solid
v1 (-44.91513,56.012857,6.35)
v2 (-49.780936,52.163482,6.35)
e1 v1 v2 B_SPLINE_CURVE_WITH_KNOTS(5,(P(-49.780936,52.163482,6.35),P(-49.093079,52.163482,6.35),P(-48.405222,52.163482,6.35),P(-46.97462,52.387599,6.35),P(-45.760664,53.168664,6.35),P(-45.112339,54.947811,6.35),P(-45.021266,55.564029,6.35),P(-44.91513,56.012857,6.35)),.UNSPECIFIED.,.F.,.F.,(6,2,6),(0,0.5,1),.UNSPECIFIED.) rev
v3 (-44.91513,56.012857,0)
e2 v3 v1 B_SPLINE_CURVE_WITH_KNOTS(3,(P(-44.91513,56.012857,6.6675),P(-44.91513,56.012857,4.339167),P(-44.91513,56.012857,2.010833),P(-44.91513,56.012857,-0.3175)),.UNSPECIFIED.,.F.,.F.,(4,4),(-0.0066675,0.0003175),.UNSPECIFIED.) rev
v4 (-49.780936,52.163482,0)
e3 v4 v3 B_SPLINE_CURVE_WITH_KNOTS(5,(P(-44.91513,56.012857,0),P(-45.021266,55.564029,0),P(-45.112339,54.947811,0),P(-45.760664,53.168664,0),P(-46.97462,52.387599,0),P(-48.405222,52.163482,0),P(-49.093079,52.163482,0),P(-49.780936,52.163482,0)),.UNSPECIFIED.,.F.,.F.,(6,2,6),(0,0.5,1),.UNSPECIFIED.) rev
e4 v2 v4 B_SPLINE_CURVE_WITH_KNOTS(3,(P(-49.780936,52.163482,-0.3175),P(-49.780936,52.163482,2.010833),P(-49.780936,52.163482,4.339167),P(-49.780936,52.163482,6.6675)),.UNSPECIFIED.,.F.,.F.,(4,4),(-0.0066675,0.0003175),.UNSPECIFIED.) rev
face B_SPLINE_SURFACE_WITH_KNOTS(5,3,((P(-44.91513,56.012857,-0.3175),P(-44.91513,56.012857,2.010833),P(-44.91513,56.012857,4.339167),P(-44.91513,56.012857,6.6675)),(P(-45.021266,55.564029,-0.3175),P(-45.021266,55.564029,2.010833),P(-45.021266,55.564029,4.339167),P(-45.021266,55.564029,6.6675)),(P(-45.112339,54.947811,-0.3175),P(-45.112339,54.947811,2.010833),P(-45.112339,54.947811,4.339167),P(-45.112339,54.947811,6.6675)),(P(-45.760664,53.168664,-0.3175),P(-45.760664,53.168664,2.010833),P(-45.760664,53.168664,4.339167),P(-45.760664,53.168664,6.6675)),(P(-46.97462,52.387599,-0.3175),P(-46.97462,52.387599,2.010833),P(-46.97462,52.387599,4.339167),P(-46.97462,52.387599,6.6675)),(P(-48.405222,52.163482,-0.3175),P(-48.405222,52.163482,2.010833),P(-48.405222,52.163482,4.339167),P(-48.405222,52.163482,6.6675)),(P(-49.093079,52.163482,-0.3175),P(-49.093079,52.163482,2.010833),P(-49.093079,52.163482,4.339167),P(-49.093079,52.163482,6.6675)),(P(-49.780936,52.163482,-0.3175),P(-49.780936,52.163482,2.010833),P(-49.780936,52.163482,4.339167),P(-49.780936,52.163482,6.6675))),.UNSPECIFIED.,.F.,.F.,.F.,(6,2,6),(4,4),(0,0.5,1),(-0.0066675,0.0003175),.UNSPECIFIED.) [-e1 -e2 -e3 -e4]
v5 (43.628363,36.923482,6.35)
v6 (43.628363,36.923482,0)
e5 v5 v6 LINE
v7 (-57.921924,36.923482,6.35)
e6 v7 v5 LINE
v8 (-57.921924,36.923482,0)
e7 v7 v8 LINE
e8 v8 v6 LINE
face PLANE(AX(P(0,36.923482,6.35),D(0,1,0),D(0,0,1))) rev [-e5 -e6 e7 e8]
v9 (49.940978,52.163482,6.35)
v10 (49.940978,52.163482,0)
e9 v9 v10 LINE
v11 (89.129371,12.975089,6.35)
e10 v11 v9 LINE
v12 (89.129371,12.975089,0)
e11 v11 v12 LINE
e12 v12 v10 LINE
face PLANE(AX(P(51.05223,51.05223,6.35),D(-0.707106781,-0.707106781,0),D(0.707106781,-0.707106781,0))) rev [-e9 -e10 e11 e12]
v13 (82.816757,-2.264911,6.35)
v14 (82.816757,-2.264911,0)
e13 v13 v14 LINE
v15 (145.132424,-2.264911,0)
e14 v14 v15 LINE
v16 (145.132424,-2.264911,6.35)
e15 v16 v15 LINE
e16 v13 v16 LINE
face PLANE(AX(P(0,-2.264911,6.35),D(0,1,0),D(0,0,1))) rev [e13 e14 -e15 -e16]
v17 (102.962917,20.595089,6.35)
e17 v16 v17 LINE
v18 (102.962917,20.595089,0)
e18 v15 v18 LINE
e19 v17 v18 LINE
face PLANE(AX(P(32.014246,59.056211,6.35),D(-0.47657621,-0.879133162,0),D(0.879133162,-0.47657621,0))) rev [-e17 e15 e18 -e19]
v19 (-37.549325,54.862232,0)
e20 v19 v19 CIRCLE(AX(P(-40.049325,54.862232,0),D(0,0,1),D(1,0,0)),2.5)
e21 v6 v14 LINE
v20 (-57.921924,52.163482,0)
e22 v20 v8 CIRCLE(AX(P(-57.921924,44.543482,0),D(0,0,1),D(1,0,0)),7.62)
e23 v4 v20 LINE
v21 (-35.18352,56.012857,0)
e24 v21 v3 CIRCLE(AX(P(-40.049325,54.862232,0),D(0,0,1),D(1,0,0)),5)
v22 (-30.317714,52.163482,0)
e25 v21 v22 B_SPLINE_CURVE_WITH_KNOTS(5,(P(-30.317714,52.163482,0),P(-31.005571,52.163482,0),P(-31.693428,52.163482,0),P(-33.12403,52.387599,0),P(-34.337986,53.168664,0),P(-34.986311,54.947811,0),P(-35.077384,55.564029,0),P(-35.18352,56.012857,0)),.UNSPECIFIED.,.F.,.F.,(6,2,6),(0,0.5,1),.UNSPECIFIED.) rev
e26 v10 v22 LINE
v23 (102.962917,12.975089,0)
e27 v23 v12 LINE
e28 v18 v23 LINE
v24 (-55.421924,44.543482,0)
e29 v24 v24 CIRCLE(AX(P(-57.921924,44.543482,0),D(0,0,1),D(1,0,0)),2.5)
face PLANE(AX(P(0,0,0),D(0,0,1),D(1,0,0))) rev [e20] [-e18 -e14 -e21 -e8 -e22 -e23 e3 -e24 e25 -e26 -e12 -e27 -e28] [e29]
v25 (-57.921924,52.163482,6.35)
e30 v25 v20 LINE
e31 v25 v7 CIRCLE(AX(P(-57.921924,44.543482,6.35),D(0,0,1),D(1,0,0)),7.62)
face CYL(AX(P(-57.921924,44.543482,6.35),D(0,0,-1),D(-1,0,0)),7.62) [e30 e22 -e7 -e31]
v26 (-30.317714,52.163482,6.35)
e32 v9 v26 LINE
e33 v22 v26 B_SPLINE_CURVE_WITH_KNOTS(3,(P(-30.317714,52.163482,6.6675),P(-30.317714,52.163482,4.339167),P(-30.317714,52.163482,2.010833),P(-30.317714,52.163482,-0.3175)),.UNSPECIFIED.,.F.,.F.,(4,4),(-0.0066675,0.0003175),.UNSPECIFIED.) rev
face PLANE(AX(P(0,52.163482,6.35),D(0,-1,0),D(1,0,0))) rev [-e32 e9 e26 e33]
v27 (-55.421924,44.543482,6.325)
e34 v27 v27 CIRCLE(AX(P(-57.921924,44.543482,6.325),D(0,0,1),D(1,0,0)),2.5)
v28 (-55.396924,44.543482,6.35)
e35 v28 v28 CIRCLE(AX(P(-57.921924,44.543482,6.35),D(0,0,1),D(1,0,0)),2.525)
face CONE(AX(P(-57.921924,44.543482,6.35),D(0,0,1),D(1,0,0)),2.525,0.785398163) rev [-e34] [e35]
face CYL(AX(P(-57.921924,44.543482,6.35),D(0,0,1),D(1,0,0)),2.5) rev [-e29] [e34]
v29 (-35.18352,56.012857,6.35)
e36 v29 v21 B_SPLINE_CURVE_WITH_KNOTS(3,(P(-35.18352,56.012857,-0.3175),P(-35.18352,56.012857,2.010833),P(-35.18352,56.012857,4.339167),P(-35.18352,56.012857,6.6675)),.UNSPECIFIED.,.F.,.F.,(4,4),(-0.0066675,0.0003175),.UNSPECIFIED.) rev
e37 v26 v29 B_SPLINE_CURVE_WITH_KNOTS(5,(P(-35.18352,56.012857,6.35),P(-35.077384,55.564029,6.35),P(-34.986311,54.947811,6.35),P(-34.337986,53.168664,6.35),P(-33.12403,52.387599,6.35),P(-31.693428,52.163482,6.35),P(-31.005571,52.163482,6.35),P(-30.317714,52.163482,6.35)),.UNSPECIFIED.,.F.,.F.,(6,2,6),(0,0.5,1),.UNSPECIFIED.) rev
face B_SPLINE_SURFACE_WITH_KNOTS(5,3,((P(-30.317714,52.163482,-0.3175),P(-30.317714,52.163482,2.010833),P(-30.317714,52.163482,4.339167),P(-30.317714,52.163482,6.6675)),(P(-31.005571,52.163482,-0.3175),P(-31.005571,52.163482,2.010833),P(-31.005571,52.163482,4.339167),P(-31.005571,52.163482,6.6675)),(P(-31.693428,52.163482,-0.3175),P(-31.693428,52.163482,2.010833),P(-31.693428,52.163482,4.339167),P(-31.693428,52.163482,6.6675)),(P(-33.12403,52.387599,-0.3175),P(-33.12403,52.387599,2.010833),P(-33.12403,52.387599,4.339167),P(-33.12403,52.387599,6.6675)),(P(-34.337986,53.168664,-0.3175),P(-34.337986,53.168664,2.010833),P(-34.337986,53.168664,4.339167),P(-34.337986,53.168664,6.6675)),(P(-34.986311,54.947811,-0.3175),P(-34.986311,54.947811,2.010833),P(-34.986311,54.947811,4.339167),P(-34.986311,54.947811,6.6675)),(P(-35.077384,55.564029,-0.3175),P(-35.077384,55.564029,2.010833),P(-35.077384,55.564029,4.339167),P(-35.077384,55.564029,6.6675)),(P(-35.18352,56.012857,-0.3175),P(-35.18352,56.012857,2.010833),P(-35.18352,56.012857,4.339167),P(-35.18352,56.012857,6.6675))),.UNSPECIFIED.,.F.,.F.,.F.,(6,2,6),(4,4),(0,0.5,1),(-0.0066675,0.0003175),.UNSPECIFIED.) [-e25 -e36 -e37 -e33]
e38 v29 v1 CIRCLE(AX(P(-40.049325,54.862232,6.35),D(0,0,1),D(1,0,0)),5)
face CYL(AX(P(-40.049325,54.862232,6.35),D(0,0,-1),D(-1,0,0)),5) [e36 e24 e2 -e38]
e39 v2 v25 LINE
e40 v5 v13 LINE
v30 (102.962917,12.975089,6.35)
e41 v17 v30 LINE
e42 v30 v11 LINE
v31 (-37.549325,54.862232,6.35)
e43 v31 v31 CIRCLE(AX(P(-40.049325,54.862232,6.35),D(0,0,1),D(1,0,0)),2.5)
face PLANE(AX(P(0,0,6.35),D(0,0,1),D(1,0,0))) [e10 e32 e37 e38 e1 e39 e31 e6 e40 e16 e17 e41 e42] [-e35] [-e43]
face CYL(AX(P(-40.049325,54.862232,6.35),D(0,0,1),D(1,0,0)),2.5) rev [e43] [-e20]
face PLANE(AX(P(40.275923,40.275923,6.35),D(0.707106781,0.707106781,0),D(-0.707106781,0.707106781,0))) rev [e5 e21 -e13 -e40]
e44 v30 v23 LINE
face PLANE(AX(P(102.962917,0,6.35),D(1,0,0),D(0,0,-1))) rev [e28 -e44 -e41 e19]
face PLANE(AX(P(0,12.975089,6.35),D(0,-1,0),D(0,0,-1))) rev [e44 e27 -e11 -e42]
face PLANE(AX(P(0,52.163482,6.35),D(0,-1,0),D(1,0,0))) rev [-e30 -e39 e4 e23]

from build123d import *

# Parameters (mm, degrees)
SKETCH1_R                       = 7.62
BOSS_EXTRUDE1_DEPTH             = 6.35
F_5_0MM_DOWEL_HOLE1_D           = 5
F_5_0MM_DOWEL_HOLE1_CSINK_D     = 5.05
F_5_0MM_DOWEL_HOLE1_CSINK_ANGLE = 90
BOSS_EXTRUDE3_DEPTH             = 6.35
FILLET2_DEPTH                   = 6.35
F_5_0MM_DOWEL_HOLE3_D           = 5


with BuildPart() as part:
    # Sketch1 → Boss-Extrude1 (new body)
    with BuildSketch(Plane.XY):
        with BuildLine():
            ThreePointArc((-50.301924176, 44.54348243), (-52.533770503, 39.155328757), (-57.921924176, 36.92348243))
            Line((-57.921924176, 36.92348243), (43.628363104, 36.92348243))
            Line((43.628363104, 36.92348243), (82.81675676, -2.264911225))
            Line((82.81675676, -2.264911225), (145.132424058, -2.264911225))
            Line((145.132424058, -2.264911225), (102.962916525, 20.595088775))
            Line((102.962916525, 20.595088775), (102.962916525, 12.975088775))
            Line((102.962916525, 12.975088775), (89.12937145, 12.975088775))
            Line((89.12937145, 12.975088775), (49.940977795, 52.16348243))
            Line((49.940977795, 52.16348243), (-57.921924176, 52.16348243))
            ThreePointArc((-57.921924176, 52.16348243), (-52.533770503, 49.931636103), (-50.301924176, 44.54348243))
        make_face()
        with Locations((-57.921924176, 44.54348243)):
            Circle(SKETCH1_R)
    extrude(amount=BOSS_EXTRUDE1_DEPTH)

    # Ø5.0mm Dowel Hole1 (through all)
    with Locations(Plane.XY.offset(6.35)):
        with Locations((-57.921924176, 44.54348243)):
            CounterSinkHole(F_5_0MM_DOWEL_HOLE1_D / 2, F_5_0MM_DOWEL_HOLE1_CSINK_D / 2, counter_sink_angle=F_5_0MM_DOWEL_HOLE1_CSINK_ANGLE)

    # Sketch4 → Boss-Extrude3 (add)
    with BuildSketch(Plane.XY):
        with BuildLine():
            Line((-45.049324905, 52.16348243), (-35.049324905, 52.16348243))
            Line((-35.049324905, 52.16348243), (-35.049324905, 54.86223243))
            ThreePointArc((-35.049324905, 54.86223243), (-40.049324905, 59.86223243), (-45.049324905, 54.86223243))
            Line((-45.049324905, 54.86223243), (-45.049324905, 52.16348243))
        make_face()
    extrude(amount=BOSS_EXTRUDE3_DEPTH)

    # Fillet2: read off the stored shape, not the designer's step
    # Fillet2 outline → Fillet2 (add)
    with BuildSketch(Plane.XY):
        with BuildLine():
            Line((-35.049324905, 52.16348243), (-30.317714122, 52.16348243))
            add(Edge.make_bspline(
                [(-30.317714122, 52.16348243), (-31.005571174, 52.16348243), (-31.693428226, 52.16348243), (-33.124030191, 52.387599223), (-34.337985858, 53.16866407), (-34.986310807, 54.947810993), (-35.077384253, 55.56402873), (-35.183519514, 56.01285743)],
                knots=[0, 0, 0, 0, 0, 0, 0.5, 0.5, 1, 1, 1, 1, 1, 1], degree=5))
            ThreePointArc((-35.183519514, 56.01285743), (-35.08298687, 55.441444413), (-35.049324905, 54.86223243))
            Line((-35.049324905, 54.86223243), (-35.049324905, 52.16348243))
        make_face()
        with BuildLine():
            ThreePointArc((-45.049324905, 54.86223243), (-45.01566294, 55.441444413), (-44.915130297, 56.01285743))
            add(Edge.make_bspline(
                [(-44.915130297, 56.01285743), (-45.021265558, 55.56402873), (-45.112339003, 54.947810993), (-45.760663953, 53.16866407), (-46.97461962, 52.387599223), (-48.405221585, 52.16348243), (-49.093078637, 52.16348243), (-49.780935689, 52.16348243)],
                knots=[0, 0, 0, 0, 0, 0, 0.5, 0.5, 1, 1, 1, 1, 1, 1], degree=5))
            Line((-49.780935689, 52.16348243), (-45.049324905, 52.16348243))
            Line((-45.049324905, 52.16348243), (-45.049324905, 54.86223243))
        make_face()
    extrude(amount=FILLET2_DEPTH)

    # Ø5.0mm Dowel Hole3 (through all)
    with Locations(Plane.XY.offset(6.35)):
        with Locations((-40.049324905, 54.86223243)):
            Hole(F_5_0MM_DOWEL_HOLE3_D / 2)


solid = part.part
